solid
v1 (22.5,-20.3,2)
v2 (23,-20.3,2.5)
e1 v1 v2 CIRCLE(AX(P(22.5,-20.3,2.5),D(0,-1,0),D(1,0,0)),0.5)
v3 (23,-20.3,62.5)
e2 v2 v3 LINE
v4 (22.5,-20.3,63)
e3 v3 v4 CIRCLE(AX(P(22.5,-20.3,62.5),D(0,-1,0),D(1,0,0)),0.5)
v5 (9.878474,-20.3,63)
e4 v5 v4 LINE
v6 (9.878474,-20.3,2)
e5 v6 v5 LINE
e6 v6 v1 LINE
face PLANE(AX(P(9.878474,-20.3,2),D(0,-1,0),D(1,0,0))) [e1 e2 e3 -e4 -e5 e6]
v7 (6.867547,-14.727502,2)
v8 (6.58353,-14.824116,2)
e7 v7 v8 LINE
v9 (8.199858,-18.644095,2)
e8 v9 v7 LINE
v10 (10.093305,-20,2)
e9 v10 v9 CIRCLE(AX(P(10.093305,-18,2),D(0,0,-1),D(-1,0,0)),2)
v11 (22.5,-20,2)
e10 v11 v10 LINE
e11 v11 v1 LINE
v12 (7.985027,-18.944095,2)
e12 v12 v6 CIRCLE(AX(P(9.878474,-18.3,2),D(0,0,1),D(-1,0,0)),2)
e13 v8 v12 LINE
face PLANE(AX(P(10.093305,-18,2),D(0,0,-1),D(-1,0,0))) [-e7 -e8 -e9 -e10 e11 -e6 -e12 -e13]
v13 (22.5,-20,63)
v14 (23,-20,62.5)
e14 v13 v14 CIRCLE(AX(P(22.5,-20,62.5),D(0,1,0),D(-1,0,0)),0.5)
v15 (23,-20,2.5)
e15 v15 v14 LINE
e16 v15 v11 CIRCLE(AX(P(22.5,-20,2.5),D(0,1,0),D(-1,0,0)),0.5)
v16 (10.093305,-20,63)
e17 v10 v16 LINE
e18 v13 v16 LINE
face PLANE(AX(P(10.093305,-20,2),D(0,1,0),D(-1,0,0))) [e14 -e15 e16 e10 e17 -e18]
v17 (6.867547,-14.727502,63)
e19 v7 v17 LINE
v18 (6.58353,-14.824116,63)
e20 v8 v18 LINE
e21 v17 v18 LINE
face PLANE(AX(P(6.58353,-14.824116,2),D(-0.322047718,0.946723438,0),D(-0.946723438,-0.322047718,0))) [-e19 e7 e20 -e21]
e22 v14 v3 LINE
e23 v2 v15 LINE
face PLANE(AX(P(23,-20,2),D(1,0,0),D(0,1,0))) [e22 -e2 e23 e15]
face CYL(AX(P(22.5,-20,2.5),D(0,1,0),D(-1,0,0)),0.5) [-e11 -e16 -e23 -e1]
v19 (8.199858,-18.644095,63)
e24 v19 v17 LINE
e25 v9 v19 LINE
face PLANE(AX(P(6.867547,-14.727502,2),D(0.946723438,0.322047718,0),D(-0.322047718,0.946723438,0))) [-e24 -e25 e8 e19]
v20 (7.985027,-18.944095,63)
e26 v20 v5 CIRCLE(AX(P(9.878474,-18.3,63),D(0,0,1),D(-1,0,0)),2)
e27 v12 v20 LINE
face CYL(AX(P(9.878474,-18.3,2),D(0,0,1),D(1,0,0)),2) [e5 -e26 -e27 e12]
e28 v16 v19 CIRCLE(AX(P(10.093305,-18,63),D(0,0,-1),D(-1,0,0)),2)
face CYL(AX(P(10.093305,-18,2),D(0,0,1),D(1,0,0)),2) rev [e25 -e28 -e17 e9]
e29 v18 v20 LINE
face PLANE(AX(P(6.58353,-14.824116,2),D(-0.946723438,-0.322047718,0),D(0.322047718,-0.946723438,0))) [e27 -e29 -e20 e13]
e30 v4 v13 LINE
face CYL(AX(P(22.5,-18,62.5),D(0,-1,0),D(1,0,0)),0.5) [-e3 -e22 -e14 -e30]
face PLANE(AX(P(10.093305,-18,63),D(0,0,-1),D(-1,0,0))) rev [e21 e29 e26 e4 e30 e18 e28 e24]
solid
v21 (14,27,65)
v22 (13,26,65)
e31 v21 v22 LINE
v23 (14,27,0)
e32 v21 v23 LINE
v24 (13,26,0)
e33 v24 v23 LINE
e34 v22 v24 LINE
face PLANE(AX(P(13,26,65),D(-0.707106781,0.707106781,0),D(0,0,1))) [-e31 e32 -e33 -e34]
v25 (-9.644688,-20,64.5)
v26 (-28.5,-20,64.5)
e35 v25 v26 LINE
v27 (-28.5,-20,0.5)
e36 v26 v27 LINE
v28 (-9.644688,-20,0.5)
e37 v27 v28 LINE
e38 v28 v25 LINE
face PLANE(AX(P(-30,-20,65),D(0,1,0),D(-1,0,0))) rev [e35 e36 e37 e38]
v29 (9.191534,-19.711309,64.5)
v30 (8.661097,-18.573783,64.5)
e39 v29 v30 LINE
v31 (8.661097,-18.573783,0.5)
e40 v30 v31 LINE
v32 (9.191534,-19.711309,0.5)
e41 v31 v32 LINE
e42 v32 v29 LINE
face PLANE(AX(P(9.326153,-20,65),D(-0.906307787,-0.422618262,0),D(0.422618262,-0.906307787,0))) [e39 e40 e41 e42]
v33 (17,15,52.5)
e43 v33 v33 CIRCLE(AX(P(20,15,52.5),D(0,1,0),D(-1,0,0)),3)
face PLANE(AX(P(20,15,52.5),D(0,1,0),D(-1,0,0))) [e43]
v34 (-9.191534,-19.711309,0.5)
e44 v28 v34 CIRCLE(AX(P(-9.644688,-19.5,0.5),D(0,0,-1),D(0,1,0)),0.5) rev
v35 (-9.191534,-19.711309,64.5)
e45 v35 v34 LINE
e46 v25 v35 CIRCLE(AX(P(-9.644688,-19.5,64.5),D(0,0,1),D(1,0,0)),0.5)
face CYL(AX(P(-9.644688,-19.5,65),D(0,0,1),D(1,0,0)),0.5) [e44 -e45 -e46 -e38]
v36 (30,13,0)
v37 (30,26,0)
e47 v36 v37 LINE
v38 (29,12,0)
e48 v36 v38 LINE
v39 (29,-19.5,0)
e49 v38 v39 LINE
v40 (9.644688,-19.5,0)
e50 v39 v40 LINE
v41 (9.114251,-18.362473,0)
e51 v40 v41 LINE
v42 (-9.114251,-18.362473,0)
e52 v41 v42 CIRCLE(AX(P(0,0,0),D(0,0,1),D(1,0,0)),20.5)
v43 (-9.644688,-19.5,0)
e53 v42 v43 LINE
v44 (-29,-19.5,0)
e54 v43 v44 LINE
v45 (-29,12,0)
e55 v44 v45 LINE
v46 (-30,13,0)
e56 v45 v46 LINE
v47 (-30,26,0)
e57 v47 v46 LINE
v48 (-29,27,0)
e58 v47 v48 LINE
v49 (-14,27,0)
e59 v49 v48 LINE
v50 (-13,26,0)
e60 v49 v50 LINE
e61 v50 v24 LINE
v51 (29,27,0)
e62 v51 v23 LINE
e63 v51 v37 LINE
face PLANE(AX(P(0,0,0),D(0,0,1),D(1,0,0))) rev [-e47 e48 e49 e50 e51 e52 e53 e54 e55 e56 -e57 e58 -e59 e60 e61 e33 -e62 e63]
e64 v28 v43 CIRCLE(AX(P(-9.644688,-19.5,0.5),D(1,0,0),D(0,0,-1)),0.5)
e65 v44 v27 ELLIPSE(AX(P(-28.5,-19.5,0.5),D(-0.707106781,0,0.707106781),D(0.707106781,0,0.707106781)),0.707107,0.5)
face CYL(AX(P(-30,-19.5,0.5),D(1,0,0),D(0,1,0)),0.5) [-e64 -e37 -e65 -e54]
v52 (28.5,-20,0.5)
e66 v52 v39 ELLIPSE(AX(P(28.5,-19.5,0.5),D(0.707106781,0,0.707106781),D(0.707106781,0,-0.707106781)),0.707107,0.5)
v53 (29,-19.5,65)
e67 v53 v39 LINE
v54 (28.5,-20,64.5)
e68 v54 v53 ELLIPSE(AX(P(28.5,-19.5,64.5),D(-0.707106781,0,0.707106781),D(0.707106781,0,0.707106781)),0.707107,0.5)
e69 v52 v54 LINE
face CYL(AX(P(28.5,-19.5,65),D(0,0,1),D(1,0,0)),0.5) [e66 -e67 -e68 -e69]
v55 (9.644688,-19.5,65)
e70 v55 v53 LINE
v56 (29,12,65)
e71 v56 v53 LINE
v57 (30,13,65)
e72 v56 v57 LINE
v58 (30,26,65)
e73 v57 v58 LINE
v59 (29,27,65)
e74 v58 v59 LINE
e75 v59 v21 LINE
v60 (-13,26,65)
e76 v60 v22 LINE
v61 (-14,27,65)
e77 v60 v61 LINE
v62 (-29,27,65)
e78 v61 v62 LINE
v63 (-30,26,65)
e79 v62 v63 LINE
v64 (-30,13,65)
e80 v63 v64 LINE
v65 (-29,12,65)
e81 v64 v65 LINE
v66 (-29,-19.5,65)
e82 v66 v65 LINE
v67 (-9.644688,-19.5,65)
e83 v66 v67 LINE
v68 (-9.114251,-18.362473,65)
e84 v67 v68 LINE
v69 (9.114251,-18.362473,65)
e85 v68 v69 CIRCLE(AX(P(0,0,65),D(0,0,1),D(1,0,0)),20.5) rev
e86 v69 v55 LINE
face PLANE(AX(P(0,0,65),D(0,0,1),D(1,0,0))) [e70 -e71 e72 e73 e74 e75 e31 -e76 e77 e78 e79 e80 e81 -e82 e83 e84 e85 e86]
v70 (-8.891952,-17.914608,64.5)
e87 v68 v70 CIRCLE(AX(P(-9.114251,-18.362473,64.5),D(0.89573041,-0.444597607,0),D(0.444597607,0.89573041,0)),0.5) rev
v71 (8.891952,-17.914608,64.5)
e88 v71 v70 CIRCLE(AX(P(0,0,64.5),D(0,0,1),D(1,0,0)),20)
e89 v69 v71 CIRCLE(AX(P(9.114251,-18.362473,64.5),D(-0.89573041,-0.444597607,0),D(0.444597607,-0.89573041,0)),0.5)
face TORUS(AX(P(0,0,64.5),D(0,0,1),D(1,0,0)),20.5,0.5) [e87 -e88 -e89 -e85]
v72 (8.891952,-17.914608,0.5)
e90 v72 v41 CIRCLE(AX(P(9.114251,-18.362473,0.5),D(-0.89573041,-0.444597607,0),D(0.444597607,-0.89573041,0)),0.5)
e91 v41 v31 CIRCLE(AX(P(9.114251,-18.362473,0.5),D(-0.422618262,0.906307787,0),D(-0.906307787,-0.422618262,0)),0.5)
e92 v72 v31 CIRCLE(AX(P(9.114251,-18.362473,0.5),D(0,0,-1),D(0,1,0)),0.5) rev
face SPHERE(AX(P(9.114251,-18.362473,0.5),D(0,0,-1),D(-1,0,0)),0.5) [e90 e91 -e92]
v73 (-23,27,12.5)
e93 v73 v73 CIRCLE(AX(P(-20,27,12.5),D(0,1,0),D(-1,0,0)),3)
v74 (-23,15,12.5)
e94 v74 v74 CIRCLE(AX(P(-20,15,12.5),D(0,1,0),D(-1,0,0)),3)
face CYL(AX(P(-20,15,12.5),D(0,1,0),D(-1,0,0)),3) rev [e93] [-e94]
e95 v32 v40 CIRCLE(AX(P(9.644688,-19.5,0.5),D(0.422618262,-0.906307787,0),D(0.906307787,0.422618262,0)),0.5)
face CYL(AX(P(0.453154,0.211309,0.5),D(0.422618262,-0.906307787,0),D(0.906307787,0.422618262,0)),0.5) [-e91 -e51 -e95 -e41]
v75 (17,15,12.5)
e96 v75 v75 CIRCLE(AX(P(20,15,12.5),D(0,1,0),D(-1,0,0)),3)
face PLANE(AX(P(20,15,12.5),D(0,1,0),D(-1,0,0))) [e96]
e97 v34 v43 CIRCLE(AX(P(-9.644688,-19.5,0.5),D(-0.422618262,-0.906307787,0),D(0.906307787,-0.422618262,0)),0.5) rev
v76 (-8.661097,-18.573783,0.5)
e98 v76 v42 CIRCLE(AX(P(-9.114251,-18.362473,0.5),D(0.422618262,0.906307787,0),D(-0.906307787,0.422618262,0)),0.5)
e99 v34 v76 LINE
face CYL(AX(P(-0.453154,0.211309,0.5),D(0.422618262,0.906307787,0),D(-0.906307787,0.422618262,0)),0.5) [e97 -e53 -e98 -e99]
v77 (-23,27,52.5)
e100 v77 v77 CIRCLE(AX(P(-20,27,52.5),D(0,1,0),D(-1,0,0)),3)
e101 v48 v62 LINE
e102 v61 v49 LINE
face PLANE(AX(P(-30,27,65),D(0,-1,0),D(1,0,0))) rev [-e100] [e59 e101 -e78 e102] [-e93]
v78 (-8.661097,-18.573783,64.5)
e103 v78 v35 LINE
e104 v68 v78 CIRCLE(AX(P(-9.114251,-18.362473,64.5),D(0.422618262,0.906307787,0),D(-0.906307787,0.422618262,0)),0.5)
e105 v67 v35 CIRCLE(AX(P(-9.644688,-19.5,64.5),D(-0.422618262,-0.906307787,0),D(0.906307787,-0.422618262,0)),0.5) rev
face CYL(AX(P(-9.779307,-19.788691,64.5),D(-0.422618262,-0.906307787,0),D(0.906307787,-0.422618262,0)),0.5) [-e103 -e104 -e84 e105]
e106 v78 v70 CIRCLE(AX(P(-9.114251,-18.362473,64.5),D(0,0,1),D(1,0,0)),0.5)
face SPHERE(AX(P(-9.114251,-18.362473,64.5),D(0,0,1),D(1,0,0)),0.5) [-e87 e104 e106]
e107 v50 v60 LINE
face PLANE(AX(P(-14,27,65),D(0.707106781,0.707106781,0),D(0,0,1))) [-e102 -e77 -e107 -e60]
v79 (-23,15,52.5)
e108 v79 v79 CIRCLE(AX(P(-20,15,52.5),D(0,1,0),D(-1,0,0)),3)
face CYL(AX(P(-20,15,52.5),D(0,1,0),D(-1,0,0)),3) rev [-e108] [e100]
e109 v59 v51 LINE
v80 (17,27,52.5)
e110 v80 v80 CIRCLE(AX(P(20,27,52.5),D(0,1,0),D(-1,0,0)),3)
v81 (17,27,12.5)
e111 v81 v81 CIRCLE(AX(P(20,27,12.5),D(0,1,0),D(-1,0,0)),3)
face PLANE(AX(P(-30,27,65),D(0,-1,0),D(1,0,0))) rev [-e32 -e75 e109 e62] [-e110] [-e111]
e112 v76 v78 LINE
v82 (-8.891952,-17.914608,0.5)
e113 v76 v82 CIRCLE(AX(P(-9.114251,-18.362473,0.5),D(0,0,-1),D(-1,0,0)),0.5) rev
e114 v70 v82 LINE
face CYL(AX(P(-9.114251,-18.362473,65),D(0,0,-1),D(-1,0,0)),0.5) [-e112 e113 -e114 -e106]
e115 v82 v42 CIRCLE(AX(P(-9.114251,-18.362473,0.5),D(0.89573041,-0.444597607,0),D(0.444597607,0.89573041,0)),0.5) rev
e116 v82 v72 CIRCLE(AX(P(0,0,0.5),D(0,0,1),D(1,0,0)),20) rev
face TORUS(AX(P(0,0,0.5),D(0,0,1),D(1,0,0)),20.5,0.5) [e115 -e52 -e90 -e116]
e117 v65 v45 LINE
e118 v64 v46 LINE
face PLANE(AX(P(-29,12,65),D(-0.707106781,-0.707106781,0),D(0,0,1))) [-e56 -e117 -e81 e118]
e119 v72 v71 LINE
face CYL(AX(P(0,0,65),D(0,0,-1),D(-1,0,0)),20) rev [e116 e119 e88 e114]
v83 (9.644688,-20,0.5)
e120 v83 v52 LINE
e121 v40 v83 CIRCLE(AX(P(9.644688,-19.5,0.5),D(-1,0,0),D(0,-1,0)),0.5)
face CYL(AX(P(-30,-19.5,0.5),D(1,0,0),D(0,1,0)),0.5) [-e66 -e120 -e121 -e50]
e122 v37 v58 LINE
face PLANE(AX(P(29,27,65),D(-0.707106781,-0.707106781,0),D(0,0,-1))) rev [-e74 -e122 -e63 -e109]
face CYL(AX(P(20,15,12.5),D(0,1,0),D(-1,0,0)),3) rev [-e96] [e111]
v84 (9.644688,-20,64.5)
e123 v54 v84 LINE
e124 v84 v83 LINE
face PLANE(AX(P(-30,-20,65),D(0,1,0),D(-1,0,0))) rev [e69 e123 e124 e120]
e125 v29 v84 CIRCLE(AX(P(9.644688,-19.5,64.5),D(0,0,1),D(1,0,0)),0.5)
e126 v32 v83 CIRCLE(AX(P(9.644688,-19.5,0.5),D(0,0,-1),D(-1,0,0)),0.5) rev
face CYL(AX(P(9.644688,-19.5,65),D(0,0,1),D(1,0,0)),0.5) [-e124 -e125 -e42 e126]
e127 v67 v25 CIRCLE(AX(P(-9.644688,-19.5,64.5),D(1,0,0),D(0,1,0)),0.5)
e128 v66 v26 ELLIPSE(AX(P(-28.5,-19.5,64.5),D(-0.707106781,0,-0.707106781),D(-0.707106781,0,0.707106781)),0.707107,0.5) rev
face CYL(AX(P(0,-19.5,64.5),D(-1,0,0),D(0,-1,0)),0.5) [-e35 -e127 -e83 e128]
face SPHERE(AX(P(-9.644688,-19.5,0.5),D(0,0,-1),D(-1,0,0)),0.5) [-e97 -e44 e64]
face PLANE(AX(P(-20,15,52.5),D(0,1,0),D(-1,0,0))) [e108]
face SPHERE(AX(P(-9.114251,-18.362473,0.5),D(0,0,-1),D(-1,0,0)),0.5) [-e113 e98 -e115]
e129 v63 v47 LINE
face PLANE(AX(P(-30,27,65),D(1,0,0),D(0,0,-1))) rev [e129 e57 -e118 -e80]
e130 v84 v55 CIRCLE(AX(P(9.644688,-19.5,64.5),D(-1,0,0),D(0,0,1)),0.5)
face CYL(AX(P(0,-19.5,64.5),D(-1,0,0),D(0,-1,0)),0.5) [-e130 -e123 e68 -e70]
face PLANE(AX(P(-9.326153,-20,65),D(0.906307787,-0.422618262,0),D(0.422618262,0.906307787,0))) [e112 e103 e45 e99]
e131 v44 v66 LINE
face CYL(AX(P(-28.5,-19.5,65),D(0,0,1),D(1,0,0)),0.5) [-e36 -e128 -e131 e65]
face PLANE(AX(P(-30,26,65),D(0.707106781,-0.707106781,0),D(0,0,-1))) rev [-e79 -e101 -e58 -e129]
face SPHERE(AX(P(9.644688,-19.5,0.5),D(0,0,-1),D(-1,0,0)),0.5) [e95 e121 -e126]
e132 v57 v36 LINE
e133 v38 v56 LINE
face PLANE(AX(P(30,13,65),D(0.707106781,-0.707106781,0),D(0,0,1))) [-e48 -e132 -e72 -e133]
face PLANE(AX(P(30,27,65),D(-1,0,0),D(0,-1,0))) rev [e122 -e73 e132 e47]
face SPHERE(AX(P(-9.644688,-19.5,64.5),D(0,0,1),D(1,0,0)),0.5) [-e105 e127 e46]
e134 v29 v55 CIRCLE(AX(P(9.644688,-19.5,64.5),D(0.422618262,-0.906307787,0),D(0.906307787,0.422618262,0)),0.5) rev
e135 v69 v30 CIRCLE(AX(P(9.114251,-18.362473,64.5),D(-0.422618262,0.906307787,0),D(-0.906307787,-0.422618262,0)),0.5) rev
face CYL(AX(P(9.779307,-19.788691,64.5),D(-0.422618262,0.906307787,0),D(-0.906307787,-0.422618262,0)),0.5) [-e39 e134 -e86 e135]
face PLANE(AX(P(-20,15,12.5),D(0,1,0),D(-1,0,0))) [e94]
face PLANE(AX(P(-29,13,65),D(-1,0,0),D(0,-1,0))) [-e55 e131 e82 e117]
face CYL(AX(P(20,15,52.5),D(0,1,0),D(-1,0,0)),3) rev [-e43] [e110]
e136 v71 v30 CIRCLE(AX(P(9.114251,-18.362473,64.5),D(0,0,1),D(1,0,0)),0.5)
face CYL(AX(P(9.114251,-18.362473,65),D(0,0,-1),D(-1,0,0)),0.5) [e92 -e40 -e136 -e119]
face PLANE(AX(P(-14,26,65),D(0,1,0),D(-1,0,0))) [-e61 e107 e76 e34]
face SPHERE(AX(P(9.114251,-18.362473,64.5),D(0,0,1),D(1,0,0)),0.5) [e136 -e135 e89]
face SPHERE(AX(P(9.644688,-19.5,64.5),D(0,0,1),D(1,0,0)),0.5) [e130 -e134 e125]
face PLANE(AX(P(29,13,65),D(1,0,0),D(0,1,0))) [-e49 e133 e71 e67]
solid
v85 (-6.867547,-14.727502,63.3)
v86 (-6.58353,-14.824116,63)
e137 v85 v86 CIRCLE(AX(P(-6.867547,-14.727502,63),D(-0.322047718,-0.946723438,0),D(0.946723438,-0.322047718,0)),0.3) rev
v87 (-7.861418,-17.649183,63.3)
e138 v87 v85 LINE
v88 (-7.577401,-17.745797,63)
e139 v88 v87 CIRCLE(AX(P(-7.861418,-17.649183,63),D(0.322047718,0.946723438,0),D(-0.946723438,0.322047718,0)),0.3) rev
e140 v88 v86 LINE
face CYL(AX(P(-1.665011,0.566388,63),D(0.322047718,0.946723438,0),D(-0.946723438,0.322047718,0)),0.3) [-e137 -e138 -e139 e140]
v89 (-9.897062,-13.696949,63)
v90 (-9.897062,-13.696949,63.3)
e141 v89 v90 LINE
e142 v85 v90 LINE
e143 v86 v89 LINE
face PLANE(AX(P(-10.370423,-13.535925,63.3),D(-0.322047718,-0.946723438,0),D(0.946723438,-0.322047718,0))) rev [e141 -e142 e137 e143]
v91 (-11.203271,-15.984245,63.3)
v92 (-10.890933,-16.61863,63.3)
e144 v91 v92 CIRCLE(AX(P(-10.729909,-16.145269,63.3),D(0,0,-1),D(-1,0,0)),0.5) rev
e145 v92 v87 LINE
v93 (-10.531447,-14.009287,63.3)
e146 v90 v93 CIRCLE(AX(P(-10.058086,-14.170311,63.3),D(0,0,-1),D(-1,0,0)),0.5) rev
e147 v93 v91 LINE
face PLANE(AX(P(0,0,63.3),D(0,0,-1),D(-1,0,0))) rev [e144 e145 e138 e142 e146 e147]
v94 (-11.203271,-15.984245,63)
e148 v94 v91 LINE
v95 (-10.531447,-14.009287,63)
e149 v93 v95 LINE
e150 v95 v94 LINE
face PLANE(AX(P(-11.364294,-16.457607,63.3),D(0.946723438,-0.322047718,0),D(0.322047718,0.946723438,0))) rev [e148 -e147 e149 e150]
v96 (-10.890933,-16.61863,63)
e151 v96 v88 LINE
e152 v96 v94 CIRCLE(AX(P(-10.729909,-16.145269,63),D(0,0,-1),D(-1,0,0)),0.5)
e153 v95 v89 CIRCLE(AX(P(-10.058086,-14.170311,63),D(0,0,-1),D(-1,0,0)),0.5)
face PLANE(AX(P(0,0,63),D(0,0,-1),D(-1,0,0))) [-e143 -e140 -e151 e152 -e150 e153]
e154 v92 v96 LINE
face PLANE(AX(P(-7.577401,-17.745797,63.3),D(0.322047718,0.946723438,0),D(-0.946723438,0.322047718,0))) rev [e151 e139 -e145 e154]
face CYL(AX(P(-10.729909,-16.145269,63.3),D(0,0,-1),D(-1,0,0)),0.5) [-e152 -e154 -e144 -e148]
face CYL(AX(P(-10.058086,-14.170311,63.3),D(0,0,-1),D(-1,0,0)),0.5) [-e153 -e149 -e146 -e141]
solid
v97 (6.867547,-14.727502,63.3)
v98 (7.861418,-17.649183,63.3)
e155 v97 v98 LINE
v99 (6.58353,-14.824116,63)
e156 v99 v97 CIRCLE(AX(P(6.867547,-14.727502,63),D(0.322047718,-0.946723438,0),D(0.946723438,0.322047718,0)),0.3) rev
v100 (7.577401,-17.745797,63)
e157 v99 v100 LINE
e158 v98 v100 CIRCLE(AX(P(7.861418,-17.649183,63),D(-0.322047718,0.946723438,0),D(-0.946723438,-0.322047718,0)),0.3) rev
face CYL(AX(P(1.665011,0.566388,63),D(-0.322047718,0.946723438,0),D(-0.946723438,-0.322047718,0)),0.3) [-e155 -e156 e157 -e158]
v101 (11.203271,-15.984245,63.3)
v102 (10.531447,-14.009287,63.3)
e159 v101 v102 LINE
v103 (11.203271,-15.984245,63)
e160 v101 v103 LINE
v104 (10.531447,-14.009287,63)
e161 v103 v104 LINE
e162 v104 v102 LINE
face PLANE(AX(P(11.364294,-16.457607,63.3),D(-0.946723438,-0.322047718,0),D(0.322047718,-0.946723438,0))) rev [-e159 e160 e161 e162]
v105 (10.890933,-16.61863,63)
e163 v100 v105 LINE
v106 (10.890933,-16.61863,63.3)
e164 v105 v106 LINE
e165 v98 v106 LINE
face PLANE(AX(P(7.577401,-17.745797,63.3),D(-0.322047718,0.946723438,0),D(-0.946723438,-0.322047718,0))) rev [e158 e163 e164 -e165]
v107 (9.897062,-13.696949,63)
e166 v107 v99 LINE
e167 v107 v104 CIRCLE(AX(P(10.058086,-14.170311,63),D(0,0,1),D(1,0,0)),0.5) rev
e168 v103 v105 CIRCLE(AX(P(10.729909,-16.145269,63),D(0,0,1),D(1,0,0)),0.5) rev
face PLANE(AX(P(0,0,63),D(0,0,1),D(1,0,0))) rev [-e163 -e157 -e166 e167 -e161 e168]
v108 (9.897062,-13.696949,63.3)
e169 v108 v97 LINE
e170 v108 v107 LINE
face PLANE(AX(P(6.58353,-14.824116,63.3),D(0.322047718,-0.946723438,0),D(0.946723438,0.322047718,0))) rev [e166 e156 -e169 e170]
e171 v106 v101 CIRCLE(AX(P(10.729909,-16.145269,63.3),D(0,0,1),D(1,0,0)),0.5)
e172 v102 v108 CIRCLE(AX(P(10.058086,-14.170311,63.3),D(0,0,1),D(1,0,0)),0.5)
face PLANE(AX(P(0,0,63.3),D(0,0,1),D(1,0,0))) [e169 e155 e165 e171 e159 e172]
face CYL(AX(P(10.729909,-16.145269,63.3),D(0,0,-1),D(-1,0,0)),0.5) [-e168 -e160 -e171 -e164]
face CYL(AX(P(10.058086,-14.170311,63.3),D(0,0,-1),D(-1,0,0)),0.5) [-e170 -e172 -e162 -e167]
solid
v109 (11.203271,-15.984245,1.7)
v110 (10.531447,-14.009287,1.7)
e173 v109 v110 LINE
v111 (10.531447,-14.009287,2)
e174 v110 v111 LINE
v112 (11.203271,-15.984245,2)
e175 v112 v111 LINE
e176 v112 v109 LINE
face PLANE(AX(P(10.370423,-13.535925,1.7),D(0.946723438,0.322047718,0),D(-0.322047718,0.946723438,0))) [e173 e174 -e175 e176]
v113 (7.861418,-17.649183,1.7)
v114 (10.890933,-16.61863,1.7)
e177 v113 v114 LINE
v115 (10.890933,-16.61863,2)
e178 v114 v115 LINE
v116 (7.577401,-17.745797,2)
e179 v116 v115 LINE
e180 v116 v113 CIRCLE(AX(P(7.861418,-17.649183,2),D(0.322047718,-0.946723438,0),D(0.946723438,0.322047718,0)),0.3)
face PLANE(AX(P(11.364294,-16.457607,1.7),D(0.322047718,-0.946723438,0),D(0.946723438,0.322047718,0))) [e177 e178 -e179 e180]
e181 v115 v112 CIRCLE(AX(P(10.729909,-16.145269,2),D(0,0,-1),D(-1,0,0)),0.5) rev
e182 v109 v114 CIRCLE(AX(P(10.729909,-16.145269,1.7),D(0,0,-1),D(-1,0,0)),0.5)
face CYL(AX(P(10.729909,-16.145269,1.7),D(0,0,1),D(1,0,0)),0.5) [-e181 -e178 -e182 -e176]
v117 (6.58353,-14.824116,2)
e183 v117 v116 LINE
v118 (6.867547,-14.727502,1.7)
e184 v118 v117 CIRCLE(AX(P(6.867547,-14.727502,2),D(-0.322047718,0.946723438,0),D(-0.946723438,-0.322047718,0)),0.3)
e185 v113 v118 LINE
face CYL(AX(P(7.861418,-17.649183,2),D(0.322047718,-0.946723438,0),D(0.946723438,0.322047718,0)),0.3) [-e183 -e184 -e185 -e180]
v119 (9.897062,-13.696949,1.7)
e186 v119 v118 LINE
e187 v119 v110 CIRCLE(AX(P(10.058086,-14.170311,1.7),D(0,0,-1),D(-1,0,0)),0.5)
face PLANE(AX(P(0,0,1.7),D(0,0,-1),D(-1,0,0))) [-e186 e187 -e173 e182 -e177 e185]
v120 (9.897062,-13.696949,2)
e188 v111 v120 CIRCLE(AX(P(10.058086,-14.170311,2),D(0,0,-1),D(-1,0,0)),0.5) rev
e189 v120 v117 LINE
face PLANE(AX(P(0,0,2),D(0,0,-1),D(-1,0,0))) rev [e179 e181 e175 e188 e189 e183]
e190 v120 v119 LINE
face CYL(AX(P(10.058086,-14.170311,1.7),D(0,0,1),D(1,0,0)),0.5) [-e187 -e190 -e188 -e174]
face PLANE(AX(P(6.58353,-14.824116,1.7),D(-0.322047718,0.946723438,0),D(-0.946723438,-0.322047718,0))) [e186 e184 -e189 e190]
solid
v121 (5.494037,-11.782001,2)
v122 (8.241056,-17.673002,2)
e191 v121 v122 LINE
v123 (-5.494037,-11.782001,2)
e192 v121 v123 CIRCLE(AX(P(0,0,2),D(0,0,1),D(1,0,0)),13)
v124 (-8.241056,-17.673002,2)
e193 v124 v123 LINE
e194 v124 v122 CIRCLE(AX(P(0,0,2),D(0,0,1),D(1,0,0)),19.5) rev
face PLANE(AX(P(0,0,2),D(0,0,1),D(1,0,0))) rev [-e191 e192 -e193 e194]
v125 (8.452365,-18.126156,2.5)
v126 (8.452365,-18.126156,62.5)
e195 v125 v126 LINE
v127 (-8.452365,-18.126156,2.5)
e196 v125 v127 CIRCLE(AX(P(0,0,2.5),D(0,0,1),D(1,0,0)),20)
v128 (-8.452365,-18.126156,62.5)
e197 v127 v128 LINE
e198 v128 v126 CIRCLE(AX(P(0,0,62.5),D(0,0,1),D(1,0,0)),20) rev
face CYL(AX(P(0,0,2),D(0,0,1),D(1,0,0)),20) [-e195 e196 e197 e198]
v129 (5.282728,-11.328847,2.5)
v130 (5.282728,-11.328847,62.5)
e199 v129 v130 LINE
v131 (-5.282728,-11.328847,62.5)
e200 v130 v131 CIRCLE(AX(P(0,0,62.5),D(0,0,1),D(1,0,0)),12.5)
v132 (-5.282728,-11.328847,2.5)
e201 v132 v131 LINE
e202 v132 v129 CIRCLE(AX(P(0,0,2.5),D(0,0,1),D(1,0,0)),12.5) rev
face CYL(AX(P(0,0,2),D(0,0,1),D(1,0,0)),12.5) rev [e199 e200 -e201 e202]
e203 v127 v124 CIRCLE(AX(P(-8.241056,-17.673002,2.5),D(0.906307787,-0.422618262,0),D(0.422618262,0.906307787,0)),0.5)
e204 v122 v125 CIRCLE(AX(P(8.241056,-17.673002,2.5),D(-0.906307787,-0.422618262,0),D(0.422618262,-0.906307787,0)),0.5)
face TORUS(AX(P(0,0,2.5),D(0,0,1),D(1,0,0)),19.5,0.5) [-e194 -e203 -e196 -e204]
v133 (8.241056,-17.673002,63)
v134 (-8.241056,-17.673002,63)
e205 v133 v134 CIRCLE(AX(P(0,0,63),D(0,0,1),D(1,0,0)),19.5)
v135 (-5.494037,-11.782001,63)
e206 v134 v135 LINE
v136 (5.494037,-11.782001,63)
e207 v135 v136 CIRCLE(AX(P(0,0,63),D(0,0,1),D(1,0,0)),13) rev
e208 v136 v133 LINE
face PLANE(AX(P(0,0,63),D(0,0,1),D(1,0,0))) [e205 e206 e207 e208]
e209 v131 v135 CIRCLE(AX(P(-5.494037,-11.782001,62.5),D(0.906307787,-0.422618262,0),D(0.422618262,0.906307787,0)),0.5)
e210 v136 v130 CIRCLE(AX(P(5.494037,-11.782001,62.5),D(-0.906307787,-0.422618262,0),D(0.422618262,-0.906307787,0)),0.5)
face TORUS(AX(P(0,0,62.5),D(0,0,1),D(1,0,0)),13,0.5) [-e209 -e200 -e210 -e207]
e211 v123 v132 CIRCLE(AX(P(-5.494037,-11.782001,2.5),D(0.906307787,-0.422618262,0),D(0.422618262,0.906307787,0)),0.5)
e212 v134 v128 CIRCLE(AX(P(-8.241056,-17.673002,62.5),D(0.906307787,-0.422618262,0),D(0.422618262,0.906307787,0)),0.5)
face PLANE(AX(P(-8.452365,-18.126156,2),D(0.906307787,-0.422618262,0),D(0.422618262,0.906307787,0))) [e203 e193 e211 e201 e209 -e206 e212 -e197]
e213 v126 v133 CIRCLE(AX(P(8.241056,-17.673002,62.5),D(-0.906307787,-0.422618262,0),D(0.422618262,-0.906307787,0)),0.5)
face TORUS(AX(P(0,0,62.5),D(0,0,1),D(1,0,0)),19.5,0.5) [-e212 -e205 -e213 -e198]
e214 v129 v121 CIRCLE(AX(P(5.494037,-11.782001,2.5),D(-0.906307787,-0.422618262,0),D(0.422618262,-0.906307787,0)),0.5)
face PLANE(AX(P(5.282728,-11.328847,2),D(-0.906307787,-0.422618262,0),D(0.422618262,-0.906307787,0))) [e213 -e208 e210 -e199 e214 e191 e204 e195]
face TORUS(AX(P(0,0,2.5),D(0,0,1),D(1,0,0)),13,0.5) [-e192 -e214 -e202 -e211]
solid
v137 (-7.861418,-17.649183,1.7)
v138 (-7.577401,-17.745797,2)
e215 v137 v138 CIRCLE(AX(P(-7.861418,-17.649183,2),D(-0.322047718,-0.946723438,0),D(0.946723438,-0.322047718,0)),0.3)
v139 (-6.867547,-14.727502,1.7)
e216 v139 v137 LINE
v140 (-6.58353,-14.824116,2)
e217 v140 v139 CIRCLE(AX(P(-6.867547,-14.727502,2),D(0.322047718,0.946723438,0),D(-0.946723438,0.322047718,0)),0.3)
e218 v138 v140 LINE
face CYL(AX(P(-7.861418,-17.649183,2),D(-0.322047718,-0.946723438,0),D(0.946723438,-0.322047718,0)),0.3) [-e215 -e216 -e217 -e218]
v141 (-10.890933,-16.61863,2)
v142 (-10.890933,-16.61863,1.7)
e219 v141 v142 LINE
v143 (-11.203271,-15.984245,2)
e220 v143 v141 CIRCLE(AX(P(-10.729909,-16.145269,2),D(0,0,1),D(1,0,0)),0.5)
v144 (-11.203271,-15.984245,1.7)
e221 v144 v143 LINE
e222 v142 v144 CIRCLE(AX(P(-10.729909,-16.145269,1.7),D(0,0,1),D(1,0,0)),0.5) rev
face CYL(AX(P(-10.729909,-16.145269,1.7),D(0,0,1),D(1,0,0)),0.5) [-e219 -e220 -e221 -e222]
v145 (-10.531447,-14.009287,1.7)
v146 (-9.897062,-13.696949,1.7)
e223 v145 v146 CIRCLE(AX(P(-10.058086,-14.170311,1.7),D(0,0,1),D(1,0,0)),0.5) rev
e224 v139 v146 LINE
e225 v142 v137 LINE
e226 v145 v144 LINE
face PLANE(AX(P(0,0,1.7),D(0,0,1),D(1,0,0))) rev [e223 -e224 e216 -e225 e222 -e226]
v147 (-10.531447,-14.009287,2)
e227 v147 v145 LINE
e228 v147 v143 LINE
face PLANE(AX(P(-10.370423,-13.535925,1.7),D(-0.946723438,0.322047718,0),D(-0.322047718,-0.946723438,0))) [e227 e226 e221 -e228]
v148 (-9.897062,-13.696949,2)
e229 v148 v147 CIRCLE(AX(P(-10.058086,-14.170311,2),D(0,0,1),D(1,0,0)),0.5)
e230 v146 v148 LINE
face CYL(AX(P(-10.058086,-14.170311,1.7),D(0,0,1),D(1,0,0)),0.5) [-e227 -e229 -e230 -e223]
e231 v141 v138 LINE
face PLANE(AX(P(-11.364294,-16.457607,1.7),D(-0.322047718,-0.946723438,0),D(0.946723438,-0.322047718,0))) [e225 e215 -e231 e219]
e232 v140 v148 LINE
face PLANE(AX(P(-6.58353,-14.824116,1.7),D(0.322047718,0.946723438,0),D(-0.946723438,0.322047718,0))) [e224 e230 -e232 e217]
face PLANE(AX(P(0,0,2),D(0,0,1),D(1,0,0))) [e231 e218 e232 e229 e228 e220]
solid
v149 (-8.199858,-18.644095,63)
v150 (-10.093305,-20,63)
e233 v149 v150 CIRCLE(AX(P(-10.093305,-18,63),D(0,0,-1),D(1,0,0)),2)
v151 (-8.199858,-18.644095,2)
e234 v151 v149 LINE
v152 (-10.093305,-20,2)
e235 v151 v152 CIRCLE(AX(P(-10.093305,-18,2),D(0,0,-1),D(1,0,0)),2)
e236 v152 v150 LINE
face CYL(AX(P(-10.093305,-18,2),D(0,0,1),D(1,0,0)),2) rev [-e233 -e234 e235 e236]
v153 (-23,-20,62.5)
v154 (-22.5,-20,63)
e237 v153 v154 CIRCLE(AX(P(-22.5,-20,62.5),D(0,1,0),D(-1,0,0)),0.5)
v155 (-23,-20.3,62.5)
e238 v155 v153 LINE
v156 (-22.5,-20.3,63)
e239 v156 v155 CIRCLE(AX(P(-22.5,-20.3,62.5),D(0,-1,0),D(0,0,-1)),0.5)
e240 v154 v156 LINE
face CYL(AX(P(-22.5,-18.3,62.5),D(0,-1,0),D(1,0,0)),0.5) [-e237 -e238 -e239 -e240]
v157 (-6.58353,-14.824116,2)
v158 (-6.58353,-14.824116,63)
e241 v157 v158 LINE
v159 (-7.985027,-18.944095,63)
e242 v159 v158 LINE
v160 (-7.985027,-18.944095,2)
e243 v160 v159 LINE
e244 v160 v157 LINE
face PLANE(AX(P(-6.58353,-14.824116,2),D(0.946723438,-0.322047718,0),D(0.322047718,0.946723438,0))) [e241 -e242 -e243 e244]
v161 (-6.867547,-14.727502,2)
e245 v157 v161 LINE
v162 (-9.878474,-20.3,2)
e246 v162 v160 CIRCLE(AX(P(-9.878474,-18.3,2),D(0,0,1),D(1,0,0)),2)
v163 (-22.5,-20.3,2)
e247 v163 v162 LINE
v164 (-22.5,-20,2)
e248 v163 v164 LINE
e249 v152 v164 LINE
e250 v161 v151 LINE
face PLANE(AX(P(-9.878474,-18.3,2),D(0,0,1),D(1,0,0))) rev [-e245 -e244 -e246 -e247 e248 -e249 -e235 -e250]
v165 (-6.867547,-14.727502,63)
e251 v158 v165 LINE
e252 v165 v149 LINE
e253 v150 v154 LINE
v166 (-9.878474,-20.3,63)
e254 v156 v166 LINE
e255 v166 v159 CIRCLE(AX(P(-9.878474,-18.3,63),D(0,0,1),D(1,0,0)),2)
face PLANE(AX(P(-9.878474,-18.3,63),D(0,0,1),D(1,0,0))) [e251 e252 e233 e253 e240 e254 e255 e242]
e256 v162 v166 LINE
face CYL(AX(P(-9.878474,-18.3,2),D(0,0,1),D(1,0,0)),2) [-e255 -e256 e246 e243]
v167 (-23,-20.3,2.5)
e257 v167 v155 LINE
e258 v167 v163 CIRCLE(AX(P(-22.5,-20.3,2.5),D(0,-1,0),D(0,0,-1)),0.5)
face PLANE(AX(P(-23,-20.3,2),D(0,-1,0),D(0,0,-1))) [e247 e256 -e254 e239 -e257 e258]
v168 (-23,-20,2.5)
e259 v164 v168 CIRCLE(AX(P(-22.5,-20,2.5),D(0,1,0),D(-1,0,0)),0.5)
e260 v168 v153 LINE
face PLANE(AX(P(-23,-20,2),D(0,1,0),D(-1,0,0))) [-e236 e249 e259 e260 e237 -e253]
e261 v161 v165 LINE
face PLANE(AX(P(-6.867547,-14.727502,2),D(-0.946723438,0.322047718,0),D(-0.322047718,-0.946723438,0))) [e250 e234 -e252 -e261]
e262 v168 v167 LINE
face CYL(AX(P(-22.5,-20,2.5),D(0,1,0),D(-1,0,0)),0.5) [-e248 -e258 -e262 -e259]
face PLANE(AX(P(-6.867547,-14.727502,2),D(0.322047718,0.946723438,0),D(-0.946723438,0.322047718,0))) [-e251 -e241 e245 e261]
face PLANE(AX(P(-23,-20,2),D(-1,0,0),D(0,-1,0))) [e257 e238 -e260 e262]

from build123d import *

# Parameters (mm, degrees)
SKETCH2_W                  = 60
SKETCH2_H                  = 47
BOSS_EXTRUDE1_DEPTH        = 65
SKETCH3_W                  = 1
SKETCH3_H                  = 33
SKETCH3_W_2                = 28
SKETCH3_H_2                = 1
CUT_EXTRUDE1_DEPTH         = 65
CUT_EXTRUDE2_DEPTH         = 65
FILLET1_R                  = 0.5
CHAMFER1_SIZE              = 1
SKETCH7_R                  = 3
CUT_EXTRUDE4_DEPTH         = 12
BOSS_EXTRUDE2_DEPTH        = 30.5
BOSS_EXTRUDE2_DEPTH_BACK   = 30.5
FILLET2_R                  = 0.5
BOSS_EXTRUDE4_DEPTH        = 30.5
BOSS_EXTRUDE4_DEPTH_BACK   = 30.5
BOSS_EXTRUDE4_2_DEPTH      = 30.5
BOSS_EXTRUDE4_2_DEPTH_BACK = 30.5
FILLET5_R                  = 0.5
FILLET4_R                  = 0.5
BOSS_EXTRUDE9_DEPTH        = 0.3
BOSS_EXTRUDE9_2_DEPTH      = 0.3
FILLET6_R                  = 0.5
FILLET7_R                  = 0.5
FILLET8_R                  = 0.3
FILLET9_R                  = 0.3
BOSS_EXTRUDE13_DEPTH       = 0.3
BOSS_EXTRUDE13_2_DEPTH     = 0.3
FILLET10_R                 = 0.5
FILLET11_R                 = 0.5
FILLET12_R                 = 0.3
FILLET13_R                 = 0.3


with BuildPart() as part:
    # Sketch2 → Boss-Extrude1 (new body)
    with BuildSketch(Plane.XY):
        with Locations((0, 3.5)):
            Rectangle(SKETCH2_W, SKETCH2_H)
    extrude(amount=BOSS_EXTRUDE1_DEPTH)

    # Sketch3 → Cut-Extrude1 (cut)
    with BuildSketch(Plane.XY):
        with Locations((-29.5, -3.5)):
            Rectangle(SKETCH3_W, SKETCH3_H)
        with Locations((29.5, -3.5)):
            Rectangle(SKETCH3_W, SKETCH3_H)
        with Locations((0, 26.5)):
            Rectangle(SKETCH3_W_2, SKETCH3_H_2)
    extrude(amount=CUT_EXTRUDE1_DEPTH, mode=Mode.SUBTRACT)

    # Sketch4 → Cut-Extrude2 (cut)
    with BuildSketch(Plane.XY):
        with BuildLine():
            Line((-9.326153163, -20), (-8.452365235, -18.126155741))
            ThreePointArc((-8.452365235, -18.126155741), (0, 20), (8.452365235, -18.126155741))
            Line((8.452365235, -18.126155741), (9.326153163, -20))
            Line((9.326153163, -20), (-9.326153163, -20))
        make_face()
    extrude(amount=CUT_EXTRUDE2_DEPTH, mode=Mode.SUBTRACT)

    # Fillet1
    fillet1_edges = [part.edges().sort_by_distance(p)[0] for p in [
        (-19.163076582, -20, 0),
        (-19.163076582, -20, 65),
        (-29, -20, 32.5),
        (29, -20, 32.5),
        (19.163076582, -20, 0),
        (19.163076582, -20, 65),
        (0, 20, 0),
        (8.452365235, -18.126155741, 32.5),
        (-8.889259199, -19.06307787, 0),
        (-8.452365235, -18.126155741, 32.5),
        (-9.326153163, -20, 32.5),
        (8.889259199, -19.06307787, 0),
        (9.326153163, -20, 32.5),
        (0, 20, 65),
        (-8.889259199, -19.06307787, 65),
        (8.889259199, -19.06307787, 65),
    ]]
    fillet(fillet1_edges, radius=FILLET1_R)

    # Chamfer1
    chamfer1_edges = [part.edges().sort_by_distance(p)[0] for p in [
        (14, 26, 32.5),
        (-14, 26, 32.5),
        (-29, 13, 32.5),
        (29, 13, 32.5),
        (-30, 27, 32.5),
        (30, 27, 32.5),
    ]]
    chamfer(chamfer1_edges, length=CHAMFER1_SIZE - 0.0001)  # a hair under: the kernel refuses the full size

    # Sketch7 → Cut-Extrude4 (cut)
    with BuildSketch(Plane(origin=(0, 27, 0), x_dir=(1, 0, 0), z_dir=(0, 1, 0))):
        with Locations(Location((-20, -12.5, 0), (0, 0, 180))):
            Circle(SKETCH7_R)
        with Locations(Location((20, -12.5, 0), (0, 0, 180))):
            Circle(SKETCH7_R)
        with Locations(Location((-20, -52.5, 0), (0, 0, 180))):
            Circle(SKETCH7_R)
        with Locations(Location((20, -52.5, 0), (0, 0, 180))):
            Circle(SKETCH7_R)
    extrude(amount=-CUT_EXTRUDE4_DEPTH, mode=Mode.SUBTRACT)


with BuildPart() as body_2:
    # Sketch8 → Boss-Extrude2 (new, two sides: drawn at the far end of the back side and taken through both)
    with BuildSketch(Plane.XY.offset(32.5).offset(-BOSS_EXTRUDE2_DEPTH_BACK)):
        with BuildLine():
            Line((-8.452365235, -18.126155741), (-5.282728272, -11.328847338))
            ThreePointArc((-5.282728272, -11.328847338), (0, 12.5), (5.282728272, -11.328847338))
            Line((5.282728272, -11.328847338), (8.452365235, -18.126155741))
            ThreePointArc((8.452365235, -18.126155741), (0, 20), (-8.452365235, -18.126155741))
        make_face()
    extrude(amount=BOSS_EXTRUDE2_DEPTH + BOSS_EXTRUDE2_DEPTH_BACK)

    # Fillet2
    fillet2_edges = [body_2.edges().sort_by_distance(p)[0] for p in [
        (0, 20, 63),
        (0, 12.5, 2),
        (0, 12.5, 63),
        (0, 20, 2),
    ]]
    fillet(fillet2_edges, radius=FILLET2_R)


with BuildPart() as body_3:
    # Sketch9 → Boss-Extrude4 (new, two sides: drawn at the far end of the back side and taken through both)
    with BuildSketch(Plane.XY.offset(32.5).offset(-BOSS_EXTRUDE4_DEPTH_BACK)):
        with BuildLine():
            Line((-23, -20), (-10.093304707, -20))
            ThreePointArc((-10.093304707, -20), (-8.928871556, -19.626067476), (-8.199857832, -18.644095435))
            Line((-8.199857832, -18.644095435), (-6.867546753, -14.727501539))
            Line((-6.867546753, -14.727501539), (-6.583529722, -14.824115855))
            Line((-6.583529722, -14.824115855), (-7.985026682, -18.944095435))
            ThreePointArc((-7.985026682, -18.944095435), (-8.714040406, -19.926067476), (-9.878473558, -20.3))
            Line((-9.878473558, -20.3), (-23, -20.3))
            Line((-23, -20.3), (-23, -20))
        make_face()
    extrude(amount=BOSS_EXTRUDE4_DEPTH + BOSS_EXTRUDE4_DEPTH_BACK)

    # Fillet4
    fillet4_edges = [body_3.edges().sort_by_distance(p)[0] for p in [
        (-23, -20.15, 63),
        (-23, -20.15, 2),
    ]]
    fillet(fillet4_edges, radius=FILLET4_R)


with BuildPart() as body_4:
    # Sketch9 → Boss-Extrude4 2 (new, two sides: drawn at the far end of the back side and taken through both)
    with BuildSketch(Plane.XY.offset(32.5).offset(-BOSS_EXTRUDE4_2_DEPTH_BACK)):
        with BuildLine():
            Line((23, -20), (23, -20.3))
            Line((23, -20.3), (9.878473558, -20.3))
            ThreePointArc((9.878473558, -20.3), (8.714040406, -19.926067476), (7.985026682, -18.944095435))
            Line((7.985026682, -18.944095435), (6.583529722, -14.824115855))
            Line((6.583529722, -14.824115855), (6.867546753, -14.727501539))
            Line((6.867546753, -14.727501539), (8.199857832, -18.644095435))
            ThreePointArc((8.199857832, -18.644095435), (8.928871556, -19.626067476), (10.093304707, -20))
            Line((10.093304707, -20), (23, -20))
        make_face()
    extrude(amount=BOSS_EXTRUDE4_2_DEPTH + BOSS_EXTRUDE4_2_DEPTH_BACK)

    # Fillet5
    fillet5_edges = [body_4.edges().sort_by_distance(p)[0] for p in [
        (23, -20.15, 2),
        (23, -20.15, 63),
    ]]
    fillet(fillet5_edges, radius=FILLET5_R)


with BuildPart() as body_5:
    # Sketch11 → Boss-Extrude9 (new body)
    with BuildSketch(Plane.XY.offset(2)):
        Polygon((-6.583529722, -14.824115855), (-10.370423473, -13.535924985), (-11.364294377, -16.457606549), (-7.577400626, -17.745797419), align=None)
    extrude(amount=-BOSS_EXTRUDE9_DEPTH)

    # Fillet7
    fillet7_edges = [body_5.edges().sort_by_distance(p)[0] for p in [
        (-11.364294377, -16.457606549, 1.85),
        (-10.370423473, -13.535924985, 1.85),
    ]]
    fillet(fillet7_edges, radius=FILLET7_R)

    # Fillet9
    fillet9_edges = [body_5.edges().sort_by_distance(p)[0] for p in [
        (-7.080465174, -16.284956637, 1.7),
    ]]
    fillet(fillet9_edges, radius=FILLET9_R - 0.0001)  # a hair under: the kernel refuses the full size


with BuildPart() as body_6:
    # Sketch11 → Boss-Extrude9 2 (new body)
    with BuildSketch(Plane.XY.offset(2)):
        Polygon((6.583529722, -14.824115855), (10.370423473, -13.535924985), (11.364294377, -16.457606549), (7.577400626, -17.745797419), align=None)
    extrude(amount=-BOSS_EXTRUDE9_2_DEPTH)

    # Fillet6
    fillet6_edges = [body_6.edges().sort_by_distance(p)[0] for p in [
        (10.370423473, -13.535924985, 1.85),
        (11.364294377, -16.457606549, 1.85),
    ]]
    fillet(fillet6_edges, radius=FILLET6_R)

    # Fillet8
    fillet8_edges = [body_6.edges().sort_by_distance(p)[0] for p in [
        (7.080465174, -16.284956637, 1.7),
    ]]
    fillet(fillet8_edges, radius=FILLET8_R - 0.0001)  # a hair under: the kernel refuses the full size


with BuildPart() as body_7:
    # Sketch13 → Boss-Extrude13 (new body)
    with BuildSketch(Plane.XY.offset(63)):
        Polygon((-6.583529722, -14.824115855), (-7.577400626, -17.745797419), (-11.364294377, -16.457606549), (-10.370423473, -13.535924985), align=None)
    extrude(amount=BOSS_EXTRUDE13_DEPTH)

    # Fillet11
    fillet11_edges = [body_7.edges().sort_by_distance(p)[0] for p in [
        (-11.364294377, -16.457606549, 63.15),
        (-10.370423473, -13.535924985, 63.15),
    ]]
    fillet(fillet11_edges, radius=FILLET11_R)

    # Fillet12
    fillet12_edges = [body_7.edges().sort_by_distance(p)[0] for p in [
        (-7.080465174, -16.284956637, 63.3),
    ]]
    fillet(fillet12_edges, radius=FILLET12_R - 0.0001)  # a hair under: the kernel refuses the full size


with BuildPart() as body_8:
    # Sketch13 → Boss-Extrude13 2 (new body)
    with BuildSketch(Plane.XY.offset(63)):
        Polygon((6.583529722, -14.824115855), (7.577400626, -17.745797419), (11.364294377, -16.457606549), (10.370423473, -13.535924985), align=None)
    extrude(amount=BOSS_EXTRUDE13_2_DEPTH)

    # Fillet10
    fillet10_edges = [body_8.edges().sort_by_distance(p)[0] for p in [
        (10.370423473, -13.535924985, 63.15),
        (11.364294377, -16.457606549, 63.15),
    ]]
    fillet(fillet10_edges, radius=FILLET10_R)

    # Fillet13
    fillet13_edges = [body_8.edges().sort_by_distance(p)[0] for p in [
        (7.080465174, -16.284956637, 63.3),
    ]]
    fillet(fillet13_edges, radius=FILLET13_R - 0.0001)  # a hair under: the kernel refuses the full size


solid = Compound([part.part, body_2.part, body_3.part, body_4.part, body_5.part, body_6.part, body_7.part, body_8.part])
